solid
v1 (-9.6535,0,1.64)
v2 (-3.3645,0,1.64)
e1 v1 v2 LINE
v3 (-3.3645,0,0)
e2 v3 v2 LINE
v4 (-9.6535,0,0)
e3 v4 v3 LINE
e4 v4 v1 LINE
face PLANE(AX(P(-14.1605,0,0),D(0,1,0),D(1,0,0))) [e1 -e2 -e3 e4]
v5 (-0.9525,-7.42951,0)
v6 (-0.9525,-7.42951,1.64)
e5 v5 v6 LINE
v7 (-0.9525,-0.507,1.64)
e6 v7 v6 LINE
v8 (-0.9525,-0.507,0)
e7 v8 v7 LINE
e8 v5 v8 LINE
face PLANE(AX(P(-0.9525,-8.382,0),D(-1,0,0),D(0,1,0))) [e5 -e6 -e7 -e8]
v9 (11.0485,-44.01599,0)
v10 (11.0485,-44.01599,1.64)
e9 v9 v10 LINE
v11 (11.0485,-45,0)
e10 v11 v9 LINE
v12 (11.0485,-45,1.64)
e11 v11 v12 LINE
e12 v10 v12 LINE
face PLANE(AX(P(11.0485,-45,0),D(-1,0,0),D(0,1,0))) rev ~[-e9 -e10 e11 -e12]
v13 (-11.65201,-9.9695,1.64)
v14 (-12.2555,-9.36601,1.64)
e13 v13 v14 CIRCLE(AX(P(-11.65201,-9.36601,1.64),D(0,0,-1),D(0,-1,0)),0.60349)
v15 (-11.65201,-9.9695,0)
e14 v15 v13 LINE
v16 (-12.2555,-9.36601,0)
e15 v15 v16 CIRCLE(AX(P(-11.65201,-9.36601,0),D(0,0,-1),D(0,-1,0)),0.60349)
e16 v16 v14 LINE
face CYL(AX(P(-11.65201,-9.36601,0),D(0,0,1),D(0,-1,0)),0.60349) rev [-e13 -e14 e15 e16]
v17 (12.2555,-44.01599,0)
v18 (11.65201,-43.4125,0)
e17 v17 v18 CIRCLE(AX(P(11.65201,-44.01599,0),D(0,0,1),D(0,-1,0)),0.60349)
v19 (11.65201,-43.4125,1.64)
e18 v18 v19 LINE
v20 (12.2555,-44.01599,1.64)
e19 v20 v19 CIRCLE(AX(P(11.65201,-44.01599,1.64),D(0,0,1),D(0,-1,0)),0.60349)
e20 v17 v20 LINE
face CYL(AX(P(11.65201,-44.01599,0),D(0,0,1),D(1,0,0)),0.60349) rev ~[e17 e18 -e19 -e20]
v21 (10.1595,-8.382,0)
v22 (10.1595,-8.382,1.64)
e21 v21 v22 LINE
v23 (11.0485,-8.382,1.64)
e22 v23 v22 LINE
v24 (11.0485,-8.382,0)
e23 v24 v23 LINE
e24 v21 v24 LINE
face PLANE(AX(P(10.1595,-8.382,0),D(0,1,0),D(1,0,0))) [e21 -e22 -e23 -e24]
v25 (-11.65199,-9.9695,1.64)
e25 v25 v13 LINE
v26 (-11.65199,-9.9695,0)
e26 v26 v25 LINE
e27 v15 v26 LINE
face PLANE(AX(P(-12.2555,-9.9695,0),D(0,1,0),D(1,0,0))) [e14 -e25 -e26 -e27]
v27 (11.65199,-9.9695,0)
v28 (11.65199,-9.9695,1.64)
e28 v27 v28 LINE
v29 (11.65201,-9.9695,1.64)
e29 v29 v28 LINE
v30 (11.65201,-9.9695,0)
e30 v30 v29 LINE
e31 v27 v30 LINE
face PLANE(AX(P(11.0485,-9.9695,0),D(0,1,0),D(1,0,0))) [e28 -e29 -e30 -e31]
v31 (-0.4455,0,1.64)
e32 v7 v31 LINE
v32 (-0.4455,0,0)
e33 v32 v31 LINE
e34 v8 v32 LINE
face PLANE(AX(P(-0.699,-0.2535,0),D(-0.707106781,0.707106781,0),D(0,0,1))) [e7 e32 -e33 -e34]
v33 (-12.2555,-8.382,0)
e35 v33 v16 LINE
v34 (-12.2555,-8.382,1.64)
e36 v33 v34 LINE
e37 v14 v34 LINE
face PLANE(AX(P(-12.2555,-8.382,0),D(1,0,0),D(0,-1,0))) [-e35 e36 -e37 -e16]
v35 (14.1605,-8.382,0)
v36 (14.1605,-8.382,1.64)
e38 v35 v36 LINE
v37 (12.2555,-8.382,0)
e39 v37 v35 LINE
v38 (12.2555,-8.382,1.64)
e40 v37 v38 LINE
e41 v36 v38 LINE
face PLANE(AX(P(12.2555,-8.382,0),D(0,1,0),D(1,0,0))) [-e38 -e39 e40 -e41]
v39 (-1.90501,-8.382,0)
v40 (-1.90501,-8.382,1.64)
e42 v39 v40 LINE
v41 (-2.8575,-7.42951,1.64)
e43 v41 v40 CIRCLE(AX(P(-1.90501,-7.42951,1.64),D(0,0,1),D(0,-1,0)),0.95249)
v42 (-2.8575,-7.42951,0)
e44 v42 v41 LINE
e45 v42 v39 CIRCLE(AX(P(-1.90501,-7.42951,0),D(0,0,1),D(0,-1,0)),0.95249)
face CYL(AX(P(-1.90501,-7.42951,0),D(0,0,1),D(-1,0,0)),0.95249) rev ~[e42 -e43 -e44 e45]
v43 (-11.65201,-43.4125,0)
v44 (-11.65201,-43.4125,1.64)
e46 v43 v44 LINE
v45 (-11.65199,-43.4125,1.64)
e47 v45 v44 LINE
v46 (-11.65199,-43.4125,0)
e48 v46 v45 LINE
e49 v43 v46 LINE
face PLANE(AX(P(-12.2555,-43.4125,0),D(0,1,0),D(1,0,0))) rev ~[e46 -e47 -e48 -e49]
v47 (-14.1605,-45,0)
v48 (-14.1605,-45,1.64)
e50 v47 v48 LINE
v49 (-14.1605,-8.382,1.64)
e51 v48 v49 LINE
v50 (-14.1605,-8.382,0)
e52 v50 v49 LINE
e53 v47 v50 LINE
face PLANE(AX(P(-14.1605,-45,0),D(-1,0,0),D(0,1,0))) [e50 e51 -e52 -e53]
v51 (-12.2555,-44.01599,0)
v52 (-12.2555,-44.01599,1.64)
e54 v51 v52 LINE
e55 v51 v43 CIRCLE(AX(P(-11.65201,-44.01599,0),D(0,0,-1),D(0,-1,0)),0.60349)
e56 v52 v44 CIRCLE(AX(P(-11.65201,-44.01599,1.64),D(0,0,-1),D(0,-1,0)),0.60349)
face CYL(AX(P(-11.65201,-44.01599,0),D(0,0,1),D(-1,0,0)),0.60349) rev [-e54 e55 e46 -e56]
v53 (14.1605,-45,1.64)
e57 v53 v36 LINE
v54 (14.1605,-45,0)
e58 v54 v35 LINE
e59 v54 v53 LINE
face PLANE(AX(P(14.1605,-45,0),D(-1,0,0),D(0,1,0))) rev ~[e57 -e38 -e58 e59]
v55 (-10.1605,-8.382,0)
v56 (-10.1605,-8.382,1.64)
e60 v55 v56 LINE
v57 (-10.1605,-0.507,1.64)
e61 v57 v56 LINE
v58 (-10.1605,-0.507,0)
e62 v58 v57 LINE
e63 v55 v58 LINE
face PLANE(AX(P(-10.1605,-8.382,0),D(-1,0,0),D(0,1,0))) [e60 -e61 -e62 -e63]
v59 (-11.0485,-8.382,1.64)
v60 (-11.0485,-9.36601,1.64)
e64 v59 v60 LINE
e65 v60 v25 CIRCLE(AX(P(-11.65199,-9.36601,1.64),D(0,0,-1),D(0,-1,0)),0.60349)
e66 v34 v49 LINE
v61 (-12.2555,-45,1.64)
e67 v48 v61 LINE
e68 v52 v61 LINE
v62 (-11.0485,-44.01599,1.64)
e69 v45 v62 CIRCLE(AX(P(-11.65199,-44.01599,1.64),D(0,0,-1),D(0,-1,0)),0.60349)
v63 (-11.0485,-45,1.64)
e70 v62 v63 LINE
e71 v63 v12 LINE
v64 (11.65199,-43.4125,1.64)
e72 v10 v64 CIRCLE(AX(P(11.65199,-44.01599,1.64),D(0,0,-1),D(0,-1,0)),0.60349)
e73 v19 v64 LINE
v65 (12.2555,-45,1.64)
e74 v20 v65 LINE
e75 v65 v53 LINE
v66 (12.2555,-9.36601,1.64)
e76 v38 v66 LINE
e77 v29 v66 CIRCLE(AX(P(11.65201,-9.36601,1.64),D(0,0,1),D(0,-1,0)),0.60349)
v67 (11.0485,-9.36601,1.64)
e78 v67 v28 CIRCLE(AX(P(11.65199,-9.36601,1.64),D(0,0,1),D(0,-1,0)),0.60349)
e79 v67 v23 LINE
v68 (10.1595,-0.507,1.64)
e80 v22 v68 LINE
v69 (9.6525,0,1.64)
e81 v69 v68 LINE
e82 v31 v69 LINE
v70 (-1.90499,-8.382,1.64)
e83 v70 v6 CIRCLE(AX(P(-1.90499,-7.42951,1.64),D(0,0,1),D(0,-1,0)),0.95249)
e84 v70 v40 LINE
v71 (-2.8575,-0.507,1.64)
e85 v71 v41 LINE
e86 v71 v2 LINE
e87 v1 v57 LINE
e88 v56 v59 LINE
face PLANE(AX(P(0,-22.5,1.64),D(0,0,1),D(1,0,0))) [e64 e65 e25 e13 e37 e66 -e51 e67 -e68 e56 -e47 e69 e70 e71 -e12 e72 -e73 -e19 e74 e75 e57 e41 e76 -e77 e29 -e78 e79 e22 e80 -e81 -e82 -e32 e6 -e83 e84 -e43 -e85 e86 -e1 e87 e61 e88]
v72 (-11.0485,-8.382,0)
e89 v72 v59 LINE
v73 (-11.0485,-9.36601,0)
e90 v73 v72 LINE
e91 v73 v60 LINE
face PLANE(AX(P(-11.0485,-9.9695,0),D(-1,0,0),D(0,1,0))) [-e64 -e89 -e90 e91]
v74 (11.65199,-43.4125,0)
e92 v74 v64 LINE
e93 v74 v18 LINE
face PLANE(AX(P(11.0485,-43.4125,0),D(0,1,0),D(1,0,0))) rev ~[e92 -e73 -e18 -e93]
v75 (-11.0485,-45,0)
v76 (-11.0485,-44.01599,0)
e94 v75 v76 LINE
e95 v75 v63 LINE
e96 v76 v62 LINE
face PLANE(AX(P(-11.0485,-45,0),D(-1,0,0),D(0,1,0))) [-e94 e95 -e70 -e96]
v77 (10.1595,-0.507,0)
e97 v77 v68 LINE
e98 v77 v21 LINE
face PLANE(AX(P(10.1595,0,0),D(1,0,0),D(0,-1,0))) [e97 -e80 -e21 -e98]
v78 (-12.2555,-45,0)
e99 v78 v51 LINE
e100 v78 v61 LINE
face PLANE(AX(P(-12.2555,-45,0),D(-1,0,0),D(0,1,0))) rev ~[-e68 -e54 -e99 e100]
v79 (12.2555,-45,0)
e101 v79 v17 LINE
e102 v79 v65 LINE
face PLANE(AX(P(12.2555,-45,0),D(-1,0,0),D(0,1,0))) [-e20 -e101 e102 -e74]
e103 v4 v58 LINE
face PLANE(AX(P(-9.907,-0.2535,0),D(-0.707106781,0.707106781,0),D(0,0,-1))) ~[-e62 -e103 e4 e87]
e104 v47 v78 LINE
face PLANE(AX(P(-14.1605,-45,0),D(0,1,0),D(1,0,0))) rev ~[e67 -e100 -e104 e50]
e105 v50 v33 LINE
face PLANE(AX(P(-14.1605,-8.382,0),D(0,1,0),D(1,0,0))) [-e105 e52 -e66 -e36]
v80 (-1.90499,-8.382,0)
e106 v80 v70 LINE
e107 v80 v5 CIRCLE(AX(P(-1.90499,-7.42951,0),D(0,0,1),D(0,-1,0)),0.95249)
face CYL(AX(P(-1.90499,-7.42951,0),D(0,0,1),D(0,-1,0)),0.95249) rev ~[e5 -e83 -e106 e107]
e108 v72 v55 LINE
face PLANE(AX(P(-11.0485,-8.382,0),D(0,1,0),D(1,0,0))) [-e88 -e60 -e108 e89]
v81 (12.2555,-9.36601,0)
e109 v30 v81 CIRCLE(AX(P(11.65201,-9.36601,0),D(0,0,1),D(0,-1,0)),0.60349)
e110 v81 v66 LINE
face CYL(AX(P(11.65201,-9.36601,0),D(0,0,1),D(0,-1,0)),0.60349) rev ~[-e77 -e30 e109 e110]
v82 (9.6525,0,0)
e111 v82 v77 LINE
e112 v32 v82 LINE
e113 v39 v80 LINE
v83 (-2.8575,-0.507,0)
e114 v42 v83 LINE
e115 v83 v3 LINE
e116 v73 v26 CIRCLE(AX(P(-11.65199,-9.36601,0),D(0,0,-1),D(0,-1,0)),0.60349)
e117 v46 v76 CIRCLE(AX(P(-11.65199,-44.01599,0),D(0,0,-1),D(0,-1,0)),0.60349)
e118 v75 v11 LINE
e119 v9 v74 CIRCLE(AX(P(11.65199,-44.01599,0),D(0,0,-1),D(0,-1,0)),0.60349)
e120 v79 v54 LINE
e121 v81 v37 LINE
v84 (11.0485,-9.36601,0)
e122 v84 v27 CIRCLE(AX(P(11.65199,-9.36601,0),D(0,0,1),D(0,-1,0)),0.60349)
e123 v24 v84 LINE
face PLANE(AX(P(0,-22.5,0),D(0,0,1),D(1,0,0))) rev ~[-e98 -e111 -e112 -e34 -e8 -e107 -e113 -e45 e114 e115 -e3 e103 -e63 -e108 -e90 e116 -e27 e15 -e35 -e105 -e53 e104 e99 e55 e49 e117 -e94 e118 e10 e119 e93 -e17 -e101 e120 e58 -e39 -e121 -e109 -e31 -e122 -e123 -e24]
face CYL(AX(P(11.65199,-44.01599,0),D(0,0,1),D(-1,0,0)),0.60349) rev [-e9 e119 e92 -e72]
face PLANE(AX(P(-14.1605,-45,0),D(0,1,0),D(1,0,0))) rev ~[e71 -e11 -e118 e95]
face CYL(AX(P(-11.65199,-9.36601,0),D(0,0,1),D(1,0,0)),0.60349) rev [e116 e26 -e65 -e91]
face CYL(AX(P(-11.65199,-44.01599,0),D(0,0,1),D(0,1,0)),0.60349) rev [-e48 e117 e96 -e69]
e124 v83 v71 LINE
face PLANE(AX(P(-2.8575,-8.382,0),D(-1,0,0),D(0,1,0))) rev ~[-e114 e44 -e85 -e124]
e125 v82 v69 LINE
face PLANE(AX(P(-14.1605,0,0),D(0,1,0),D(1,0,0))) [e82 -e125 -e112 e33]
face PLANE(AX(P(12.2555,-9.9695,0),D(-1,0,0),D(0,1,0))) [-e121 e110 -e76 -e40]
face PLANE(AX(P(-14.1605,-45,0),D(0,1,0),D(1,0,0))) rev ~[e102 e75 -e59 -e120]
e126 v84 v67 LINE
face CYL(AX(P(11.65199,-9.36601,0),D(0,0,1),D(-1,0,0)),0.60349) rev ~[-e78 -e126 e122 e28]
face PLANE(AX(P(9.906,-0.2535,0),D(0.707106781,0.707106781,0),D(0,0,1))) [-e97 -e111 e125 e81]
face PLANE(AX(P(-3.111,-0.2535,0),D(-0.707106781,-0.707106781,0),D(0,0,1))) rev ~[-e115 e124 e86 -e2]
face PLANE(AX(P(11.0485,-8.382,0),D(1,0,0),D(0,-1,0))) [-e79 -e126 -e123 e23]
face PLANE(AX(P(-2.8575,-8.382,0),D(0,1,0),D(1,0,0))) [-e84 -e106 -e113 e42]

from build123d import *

# Parameters (mm, degrees)
F0_W     = 28.321
F0_H     = 45
F1_DEPTH = 1.64
F2_W     = 1.905
F2_H     = 8.382
F2_W_2   = 1.207
F2_H_2   = 1.5875
F3_DEPTH = 25
F4_R     = 0.95249
F5_SIZE  = 0.507
F6_R     = 0.60349


# Not quite as in the source:
# - a fillet or chamfer is up to 0.001 mm smaller than in the source, because OpenCascade refuses the exact size


with BuildPart() as f1:
    # F0 (on Top) → F1 (new body)
    with BuildSketch(Plane.XY):
        with Locations((0, -22.5)):
            Rectangle(F0_W, F0_H)
    extrude(amount=F1_DEPTH)

    # F2 (on Top) → F3 (cut)
    with BuildSketch(Plane.XY):
        Polygon((-10.1605, 0), (-14.1605, 0), (-14.1605, -8.382), (-12.2555, -8.382), (-12.2555, -9.9695), (-11.0485, -9.9695), (-11.0485, -8.382), (-10.1605, -8.382), align=None)
        with Locations((-1.905, -4.191)):
            Rectangle(F2_W, F2_H)
        Polygon((14.1605, -8.382), (14.1605, 0), (10.1595, 0), (10.1595, -8.382), (11.0485, -8.382), (11.0485, -9.9695), (12.2555, -9.9695), (12.2555, -8.382), align=None)
        with Locations((-11.652, -44.20625)):
            Rectangle(F2_W_2, F2_H_2)
        with Locations((11.652, -44.20625)):
            Rectangle(F2_W_2, F2_H_2)
    extrude(amount=F3_DEPTH, mode=Mode.SUBTRACT)

    # F4 (radius 0.9525 in the source; OpenCascade refuses exactly that, so slightly less here)
    f4_edges = [f1.edges().sort_by_distance(p)[0] for p in [
        (-2.8575, -8.382, 0.82),
        (-0.9525, -8.382, 0.82),
    ]]
    fillet(f4_edges, radius=F4_R)

    # F5
    f5_edges = [f1.edges().sort_by_distance(p)[0] for p in [
        (10.1595, 0, 0.82),
        (-0.9525, 0, 0.82),
        (-2.8575, 0, 0.82),
        (-10.1605, 0, 0.82),
    ]]
    chamfer(f5_edges, length=F5_SIZE)

    # F6 (radius 0.6035 in the source; OpenCascade refuses exactly that, so slightly less here)
    f6_edges = [f1.edges().sort_by_distance(p)[0] for p in [
        (12.2555, -43.4125, 0.82),
        (-12.2555, -43.4125, 0.82),
        (-11.0485, -43.4125, 0.82),
        (11.0485, -43.4125, 0.82),
        (11.0485, -9.9695, 0.82),
        (12.2555, -9.9695, 0.82),
        (-12.2555, -9.9695, 0.82),
        (-11.0485, -9.9695, 0.82),
    ]]
    fillet(f6_edges, radius=F6_R)


solid = f1.part
